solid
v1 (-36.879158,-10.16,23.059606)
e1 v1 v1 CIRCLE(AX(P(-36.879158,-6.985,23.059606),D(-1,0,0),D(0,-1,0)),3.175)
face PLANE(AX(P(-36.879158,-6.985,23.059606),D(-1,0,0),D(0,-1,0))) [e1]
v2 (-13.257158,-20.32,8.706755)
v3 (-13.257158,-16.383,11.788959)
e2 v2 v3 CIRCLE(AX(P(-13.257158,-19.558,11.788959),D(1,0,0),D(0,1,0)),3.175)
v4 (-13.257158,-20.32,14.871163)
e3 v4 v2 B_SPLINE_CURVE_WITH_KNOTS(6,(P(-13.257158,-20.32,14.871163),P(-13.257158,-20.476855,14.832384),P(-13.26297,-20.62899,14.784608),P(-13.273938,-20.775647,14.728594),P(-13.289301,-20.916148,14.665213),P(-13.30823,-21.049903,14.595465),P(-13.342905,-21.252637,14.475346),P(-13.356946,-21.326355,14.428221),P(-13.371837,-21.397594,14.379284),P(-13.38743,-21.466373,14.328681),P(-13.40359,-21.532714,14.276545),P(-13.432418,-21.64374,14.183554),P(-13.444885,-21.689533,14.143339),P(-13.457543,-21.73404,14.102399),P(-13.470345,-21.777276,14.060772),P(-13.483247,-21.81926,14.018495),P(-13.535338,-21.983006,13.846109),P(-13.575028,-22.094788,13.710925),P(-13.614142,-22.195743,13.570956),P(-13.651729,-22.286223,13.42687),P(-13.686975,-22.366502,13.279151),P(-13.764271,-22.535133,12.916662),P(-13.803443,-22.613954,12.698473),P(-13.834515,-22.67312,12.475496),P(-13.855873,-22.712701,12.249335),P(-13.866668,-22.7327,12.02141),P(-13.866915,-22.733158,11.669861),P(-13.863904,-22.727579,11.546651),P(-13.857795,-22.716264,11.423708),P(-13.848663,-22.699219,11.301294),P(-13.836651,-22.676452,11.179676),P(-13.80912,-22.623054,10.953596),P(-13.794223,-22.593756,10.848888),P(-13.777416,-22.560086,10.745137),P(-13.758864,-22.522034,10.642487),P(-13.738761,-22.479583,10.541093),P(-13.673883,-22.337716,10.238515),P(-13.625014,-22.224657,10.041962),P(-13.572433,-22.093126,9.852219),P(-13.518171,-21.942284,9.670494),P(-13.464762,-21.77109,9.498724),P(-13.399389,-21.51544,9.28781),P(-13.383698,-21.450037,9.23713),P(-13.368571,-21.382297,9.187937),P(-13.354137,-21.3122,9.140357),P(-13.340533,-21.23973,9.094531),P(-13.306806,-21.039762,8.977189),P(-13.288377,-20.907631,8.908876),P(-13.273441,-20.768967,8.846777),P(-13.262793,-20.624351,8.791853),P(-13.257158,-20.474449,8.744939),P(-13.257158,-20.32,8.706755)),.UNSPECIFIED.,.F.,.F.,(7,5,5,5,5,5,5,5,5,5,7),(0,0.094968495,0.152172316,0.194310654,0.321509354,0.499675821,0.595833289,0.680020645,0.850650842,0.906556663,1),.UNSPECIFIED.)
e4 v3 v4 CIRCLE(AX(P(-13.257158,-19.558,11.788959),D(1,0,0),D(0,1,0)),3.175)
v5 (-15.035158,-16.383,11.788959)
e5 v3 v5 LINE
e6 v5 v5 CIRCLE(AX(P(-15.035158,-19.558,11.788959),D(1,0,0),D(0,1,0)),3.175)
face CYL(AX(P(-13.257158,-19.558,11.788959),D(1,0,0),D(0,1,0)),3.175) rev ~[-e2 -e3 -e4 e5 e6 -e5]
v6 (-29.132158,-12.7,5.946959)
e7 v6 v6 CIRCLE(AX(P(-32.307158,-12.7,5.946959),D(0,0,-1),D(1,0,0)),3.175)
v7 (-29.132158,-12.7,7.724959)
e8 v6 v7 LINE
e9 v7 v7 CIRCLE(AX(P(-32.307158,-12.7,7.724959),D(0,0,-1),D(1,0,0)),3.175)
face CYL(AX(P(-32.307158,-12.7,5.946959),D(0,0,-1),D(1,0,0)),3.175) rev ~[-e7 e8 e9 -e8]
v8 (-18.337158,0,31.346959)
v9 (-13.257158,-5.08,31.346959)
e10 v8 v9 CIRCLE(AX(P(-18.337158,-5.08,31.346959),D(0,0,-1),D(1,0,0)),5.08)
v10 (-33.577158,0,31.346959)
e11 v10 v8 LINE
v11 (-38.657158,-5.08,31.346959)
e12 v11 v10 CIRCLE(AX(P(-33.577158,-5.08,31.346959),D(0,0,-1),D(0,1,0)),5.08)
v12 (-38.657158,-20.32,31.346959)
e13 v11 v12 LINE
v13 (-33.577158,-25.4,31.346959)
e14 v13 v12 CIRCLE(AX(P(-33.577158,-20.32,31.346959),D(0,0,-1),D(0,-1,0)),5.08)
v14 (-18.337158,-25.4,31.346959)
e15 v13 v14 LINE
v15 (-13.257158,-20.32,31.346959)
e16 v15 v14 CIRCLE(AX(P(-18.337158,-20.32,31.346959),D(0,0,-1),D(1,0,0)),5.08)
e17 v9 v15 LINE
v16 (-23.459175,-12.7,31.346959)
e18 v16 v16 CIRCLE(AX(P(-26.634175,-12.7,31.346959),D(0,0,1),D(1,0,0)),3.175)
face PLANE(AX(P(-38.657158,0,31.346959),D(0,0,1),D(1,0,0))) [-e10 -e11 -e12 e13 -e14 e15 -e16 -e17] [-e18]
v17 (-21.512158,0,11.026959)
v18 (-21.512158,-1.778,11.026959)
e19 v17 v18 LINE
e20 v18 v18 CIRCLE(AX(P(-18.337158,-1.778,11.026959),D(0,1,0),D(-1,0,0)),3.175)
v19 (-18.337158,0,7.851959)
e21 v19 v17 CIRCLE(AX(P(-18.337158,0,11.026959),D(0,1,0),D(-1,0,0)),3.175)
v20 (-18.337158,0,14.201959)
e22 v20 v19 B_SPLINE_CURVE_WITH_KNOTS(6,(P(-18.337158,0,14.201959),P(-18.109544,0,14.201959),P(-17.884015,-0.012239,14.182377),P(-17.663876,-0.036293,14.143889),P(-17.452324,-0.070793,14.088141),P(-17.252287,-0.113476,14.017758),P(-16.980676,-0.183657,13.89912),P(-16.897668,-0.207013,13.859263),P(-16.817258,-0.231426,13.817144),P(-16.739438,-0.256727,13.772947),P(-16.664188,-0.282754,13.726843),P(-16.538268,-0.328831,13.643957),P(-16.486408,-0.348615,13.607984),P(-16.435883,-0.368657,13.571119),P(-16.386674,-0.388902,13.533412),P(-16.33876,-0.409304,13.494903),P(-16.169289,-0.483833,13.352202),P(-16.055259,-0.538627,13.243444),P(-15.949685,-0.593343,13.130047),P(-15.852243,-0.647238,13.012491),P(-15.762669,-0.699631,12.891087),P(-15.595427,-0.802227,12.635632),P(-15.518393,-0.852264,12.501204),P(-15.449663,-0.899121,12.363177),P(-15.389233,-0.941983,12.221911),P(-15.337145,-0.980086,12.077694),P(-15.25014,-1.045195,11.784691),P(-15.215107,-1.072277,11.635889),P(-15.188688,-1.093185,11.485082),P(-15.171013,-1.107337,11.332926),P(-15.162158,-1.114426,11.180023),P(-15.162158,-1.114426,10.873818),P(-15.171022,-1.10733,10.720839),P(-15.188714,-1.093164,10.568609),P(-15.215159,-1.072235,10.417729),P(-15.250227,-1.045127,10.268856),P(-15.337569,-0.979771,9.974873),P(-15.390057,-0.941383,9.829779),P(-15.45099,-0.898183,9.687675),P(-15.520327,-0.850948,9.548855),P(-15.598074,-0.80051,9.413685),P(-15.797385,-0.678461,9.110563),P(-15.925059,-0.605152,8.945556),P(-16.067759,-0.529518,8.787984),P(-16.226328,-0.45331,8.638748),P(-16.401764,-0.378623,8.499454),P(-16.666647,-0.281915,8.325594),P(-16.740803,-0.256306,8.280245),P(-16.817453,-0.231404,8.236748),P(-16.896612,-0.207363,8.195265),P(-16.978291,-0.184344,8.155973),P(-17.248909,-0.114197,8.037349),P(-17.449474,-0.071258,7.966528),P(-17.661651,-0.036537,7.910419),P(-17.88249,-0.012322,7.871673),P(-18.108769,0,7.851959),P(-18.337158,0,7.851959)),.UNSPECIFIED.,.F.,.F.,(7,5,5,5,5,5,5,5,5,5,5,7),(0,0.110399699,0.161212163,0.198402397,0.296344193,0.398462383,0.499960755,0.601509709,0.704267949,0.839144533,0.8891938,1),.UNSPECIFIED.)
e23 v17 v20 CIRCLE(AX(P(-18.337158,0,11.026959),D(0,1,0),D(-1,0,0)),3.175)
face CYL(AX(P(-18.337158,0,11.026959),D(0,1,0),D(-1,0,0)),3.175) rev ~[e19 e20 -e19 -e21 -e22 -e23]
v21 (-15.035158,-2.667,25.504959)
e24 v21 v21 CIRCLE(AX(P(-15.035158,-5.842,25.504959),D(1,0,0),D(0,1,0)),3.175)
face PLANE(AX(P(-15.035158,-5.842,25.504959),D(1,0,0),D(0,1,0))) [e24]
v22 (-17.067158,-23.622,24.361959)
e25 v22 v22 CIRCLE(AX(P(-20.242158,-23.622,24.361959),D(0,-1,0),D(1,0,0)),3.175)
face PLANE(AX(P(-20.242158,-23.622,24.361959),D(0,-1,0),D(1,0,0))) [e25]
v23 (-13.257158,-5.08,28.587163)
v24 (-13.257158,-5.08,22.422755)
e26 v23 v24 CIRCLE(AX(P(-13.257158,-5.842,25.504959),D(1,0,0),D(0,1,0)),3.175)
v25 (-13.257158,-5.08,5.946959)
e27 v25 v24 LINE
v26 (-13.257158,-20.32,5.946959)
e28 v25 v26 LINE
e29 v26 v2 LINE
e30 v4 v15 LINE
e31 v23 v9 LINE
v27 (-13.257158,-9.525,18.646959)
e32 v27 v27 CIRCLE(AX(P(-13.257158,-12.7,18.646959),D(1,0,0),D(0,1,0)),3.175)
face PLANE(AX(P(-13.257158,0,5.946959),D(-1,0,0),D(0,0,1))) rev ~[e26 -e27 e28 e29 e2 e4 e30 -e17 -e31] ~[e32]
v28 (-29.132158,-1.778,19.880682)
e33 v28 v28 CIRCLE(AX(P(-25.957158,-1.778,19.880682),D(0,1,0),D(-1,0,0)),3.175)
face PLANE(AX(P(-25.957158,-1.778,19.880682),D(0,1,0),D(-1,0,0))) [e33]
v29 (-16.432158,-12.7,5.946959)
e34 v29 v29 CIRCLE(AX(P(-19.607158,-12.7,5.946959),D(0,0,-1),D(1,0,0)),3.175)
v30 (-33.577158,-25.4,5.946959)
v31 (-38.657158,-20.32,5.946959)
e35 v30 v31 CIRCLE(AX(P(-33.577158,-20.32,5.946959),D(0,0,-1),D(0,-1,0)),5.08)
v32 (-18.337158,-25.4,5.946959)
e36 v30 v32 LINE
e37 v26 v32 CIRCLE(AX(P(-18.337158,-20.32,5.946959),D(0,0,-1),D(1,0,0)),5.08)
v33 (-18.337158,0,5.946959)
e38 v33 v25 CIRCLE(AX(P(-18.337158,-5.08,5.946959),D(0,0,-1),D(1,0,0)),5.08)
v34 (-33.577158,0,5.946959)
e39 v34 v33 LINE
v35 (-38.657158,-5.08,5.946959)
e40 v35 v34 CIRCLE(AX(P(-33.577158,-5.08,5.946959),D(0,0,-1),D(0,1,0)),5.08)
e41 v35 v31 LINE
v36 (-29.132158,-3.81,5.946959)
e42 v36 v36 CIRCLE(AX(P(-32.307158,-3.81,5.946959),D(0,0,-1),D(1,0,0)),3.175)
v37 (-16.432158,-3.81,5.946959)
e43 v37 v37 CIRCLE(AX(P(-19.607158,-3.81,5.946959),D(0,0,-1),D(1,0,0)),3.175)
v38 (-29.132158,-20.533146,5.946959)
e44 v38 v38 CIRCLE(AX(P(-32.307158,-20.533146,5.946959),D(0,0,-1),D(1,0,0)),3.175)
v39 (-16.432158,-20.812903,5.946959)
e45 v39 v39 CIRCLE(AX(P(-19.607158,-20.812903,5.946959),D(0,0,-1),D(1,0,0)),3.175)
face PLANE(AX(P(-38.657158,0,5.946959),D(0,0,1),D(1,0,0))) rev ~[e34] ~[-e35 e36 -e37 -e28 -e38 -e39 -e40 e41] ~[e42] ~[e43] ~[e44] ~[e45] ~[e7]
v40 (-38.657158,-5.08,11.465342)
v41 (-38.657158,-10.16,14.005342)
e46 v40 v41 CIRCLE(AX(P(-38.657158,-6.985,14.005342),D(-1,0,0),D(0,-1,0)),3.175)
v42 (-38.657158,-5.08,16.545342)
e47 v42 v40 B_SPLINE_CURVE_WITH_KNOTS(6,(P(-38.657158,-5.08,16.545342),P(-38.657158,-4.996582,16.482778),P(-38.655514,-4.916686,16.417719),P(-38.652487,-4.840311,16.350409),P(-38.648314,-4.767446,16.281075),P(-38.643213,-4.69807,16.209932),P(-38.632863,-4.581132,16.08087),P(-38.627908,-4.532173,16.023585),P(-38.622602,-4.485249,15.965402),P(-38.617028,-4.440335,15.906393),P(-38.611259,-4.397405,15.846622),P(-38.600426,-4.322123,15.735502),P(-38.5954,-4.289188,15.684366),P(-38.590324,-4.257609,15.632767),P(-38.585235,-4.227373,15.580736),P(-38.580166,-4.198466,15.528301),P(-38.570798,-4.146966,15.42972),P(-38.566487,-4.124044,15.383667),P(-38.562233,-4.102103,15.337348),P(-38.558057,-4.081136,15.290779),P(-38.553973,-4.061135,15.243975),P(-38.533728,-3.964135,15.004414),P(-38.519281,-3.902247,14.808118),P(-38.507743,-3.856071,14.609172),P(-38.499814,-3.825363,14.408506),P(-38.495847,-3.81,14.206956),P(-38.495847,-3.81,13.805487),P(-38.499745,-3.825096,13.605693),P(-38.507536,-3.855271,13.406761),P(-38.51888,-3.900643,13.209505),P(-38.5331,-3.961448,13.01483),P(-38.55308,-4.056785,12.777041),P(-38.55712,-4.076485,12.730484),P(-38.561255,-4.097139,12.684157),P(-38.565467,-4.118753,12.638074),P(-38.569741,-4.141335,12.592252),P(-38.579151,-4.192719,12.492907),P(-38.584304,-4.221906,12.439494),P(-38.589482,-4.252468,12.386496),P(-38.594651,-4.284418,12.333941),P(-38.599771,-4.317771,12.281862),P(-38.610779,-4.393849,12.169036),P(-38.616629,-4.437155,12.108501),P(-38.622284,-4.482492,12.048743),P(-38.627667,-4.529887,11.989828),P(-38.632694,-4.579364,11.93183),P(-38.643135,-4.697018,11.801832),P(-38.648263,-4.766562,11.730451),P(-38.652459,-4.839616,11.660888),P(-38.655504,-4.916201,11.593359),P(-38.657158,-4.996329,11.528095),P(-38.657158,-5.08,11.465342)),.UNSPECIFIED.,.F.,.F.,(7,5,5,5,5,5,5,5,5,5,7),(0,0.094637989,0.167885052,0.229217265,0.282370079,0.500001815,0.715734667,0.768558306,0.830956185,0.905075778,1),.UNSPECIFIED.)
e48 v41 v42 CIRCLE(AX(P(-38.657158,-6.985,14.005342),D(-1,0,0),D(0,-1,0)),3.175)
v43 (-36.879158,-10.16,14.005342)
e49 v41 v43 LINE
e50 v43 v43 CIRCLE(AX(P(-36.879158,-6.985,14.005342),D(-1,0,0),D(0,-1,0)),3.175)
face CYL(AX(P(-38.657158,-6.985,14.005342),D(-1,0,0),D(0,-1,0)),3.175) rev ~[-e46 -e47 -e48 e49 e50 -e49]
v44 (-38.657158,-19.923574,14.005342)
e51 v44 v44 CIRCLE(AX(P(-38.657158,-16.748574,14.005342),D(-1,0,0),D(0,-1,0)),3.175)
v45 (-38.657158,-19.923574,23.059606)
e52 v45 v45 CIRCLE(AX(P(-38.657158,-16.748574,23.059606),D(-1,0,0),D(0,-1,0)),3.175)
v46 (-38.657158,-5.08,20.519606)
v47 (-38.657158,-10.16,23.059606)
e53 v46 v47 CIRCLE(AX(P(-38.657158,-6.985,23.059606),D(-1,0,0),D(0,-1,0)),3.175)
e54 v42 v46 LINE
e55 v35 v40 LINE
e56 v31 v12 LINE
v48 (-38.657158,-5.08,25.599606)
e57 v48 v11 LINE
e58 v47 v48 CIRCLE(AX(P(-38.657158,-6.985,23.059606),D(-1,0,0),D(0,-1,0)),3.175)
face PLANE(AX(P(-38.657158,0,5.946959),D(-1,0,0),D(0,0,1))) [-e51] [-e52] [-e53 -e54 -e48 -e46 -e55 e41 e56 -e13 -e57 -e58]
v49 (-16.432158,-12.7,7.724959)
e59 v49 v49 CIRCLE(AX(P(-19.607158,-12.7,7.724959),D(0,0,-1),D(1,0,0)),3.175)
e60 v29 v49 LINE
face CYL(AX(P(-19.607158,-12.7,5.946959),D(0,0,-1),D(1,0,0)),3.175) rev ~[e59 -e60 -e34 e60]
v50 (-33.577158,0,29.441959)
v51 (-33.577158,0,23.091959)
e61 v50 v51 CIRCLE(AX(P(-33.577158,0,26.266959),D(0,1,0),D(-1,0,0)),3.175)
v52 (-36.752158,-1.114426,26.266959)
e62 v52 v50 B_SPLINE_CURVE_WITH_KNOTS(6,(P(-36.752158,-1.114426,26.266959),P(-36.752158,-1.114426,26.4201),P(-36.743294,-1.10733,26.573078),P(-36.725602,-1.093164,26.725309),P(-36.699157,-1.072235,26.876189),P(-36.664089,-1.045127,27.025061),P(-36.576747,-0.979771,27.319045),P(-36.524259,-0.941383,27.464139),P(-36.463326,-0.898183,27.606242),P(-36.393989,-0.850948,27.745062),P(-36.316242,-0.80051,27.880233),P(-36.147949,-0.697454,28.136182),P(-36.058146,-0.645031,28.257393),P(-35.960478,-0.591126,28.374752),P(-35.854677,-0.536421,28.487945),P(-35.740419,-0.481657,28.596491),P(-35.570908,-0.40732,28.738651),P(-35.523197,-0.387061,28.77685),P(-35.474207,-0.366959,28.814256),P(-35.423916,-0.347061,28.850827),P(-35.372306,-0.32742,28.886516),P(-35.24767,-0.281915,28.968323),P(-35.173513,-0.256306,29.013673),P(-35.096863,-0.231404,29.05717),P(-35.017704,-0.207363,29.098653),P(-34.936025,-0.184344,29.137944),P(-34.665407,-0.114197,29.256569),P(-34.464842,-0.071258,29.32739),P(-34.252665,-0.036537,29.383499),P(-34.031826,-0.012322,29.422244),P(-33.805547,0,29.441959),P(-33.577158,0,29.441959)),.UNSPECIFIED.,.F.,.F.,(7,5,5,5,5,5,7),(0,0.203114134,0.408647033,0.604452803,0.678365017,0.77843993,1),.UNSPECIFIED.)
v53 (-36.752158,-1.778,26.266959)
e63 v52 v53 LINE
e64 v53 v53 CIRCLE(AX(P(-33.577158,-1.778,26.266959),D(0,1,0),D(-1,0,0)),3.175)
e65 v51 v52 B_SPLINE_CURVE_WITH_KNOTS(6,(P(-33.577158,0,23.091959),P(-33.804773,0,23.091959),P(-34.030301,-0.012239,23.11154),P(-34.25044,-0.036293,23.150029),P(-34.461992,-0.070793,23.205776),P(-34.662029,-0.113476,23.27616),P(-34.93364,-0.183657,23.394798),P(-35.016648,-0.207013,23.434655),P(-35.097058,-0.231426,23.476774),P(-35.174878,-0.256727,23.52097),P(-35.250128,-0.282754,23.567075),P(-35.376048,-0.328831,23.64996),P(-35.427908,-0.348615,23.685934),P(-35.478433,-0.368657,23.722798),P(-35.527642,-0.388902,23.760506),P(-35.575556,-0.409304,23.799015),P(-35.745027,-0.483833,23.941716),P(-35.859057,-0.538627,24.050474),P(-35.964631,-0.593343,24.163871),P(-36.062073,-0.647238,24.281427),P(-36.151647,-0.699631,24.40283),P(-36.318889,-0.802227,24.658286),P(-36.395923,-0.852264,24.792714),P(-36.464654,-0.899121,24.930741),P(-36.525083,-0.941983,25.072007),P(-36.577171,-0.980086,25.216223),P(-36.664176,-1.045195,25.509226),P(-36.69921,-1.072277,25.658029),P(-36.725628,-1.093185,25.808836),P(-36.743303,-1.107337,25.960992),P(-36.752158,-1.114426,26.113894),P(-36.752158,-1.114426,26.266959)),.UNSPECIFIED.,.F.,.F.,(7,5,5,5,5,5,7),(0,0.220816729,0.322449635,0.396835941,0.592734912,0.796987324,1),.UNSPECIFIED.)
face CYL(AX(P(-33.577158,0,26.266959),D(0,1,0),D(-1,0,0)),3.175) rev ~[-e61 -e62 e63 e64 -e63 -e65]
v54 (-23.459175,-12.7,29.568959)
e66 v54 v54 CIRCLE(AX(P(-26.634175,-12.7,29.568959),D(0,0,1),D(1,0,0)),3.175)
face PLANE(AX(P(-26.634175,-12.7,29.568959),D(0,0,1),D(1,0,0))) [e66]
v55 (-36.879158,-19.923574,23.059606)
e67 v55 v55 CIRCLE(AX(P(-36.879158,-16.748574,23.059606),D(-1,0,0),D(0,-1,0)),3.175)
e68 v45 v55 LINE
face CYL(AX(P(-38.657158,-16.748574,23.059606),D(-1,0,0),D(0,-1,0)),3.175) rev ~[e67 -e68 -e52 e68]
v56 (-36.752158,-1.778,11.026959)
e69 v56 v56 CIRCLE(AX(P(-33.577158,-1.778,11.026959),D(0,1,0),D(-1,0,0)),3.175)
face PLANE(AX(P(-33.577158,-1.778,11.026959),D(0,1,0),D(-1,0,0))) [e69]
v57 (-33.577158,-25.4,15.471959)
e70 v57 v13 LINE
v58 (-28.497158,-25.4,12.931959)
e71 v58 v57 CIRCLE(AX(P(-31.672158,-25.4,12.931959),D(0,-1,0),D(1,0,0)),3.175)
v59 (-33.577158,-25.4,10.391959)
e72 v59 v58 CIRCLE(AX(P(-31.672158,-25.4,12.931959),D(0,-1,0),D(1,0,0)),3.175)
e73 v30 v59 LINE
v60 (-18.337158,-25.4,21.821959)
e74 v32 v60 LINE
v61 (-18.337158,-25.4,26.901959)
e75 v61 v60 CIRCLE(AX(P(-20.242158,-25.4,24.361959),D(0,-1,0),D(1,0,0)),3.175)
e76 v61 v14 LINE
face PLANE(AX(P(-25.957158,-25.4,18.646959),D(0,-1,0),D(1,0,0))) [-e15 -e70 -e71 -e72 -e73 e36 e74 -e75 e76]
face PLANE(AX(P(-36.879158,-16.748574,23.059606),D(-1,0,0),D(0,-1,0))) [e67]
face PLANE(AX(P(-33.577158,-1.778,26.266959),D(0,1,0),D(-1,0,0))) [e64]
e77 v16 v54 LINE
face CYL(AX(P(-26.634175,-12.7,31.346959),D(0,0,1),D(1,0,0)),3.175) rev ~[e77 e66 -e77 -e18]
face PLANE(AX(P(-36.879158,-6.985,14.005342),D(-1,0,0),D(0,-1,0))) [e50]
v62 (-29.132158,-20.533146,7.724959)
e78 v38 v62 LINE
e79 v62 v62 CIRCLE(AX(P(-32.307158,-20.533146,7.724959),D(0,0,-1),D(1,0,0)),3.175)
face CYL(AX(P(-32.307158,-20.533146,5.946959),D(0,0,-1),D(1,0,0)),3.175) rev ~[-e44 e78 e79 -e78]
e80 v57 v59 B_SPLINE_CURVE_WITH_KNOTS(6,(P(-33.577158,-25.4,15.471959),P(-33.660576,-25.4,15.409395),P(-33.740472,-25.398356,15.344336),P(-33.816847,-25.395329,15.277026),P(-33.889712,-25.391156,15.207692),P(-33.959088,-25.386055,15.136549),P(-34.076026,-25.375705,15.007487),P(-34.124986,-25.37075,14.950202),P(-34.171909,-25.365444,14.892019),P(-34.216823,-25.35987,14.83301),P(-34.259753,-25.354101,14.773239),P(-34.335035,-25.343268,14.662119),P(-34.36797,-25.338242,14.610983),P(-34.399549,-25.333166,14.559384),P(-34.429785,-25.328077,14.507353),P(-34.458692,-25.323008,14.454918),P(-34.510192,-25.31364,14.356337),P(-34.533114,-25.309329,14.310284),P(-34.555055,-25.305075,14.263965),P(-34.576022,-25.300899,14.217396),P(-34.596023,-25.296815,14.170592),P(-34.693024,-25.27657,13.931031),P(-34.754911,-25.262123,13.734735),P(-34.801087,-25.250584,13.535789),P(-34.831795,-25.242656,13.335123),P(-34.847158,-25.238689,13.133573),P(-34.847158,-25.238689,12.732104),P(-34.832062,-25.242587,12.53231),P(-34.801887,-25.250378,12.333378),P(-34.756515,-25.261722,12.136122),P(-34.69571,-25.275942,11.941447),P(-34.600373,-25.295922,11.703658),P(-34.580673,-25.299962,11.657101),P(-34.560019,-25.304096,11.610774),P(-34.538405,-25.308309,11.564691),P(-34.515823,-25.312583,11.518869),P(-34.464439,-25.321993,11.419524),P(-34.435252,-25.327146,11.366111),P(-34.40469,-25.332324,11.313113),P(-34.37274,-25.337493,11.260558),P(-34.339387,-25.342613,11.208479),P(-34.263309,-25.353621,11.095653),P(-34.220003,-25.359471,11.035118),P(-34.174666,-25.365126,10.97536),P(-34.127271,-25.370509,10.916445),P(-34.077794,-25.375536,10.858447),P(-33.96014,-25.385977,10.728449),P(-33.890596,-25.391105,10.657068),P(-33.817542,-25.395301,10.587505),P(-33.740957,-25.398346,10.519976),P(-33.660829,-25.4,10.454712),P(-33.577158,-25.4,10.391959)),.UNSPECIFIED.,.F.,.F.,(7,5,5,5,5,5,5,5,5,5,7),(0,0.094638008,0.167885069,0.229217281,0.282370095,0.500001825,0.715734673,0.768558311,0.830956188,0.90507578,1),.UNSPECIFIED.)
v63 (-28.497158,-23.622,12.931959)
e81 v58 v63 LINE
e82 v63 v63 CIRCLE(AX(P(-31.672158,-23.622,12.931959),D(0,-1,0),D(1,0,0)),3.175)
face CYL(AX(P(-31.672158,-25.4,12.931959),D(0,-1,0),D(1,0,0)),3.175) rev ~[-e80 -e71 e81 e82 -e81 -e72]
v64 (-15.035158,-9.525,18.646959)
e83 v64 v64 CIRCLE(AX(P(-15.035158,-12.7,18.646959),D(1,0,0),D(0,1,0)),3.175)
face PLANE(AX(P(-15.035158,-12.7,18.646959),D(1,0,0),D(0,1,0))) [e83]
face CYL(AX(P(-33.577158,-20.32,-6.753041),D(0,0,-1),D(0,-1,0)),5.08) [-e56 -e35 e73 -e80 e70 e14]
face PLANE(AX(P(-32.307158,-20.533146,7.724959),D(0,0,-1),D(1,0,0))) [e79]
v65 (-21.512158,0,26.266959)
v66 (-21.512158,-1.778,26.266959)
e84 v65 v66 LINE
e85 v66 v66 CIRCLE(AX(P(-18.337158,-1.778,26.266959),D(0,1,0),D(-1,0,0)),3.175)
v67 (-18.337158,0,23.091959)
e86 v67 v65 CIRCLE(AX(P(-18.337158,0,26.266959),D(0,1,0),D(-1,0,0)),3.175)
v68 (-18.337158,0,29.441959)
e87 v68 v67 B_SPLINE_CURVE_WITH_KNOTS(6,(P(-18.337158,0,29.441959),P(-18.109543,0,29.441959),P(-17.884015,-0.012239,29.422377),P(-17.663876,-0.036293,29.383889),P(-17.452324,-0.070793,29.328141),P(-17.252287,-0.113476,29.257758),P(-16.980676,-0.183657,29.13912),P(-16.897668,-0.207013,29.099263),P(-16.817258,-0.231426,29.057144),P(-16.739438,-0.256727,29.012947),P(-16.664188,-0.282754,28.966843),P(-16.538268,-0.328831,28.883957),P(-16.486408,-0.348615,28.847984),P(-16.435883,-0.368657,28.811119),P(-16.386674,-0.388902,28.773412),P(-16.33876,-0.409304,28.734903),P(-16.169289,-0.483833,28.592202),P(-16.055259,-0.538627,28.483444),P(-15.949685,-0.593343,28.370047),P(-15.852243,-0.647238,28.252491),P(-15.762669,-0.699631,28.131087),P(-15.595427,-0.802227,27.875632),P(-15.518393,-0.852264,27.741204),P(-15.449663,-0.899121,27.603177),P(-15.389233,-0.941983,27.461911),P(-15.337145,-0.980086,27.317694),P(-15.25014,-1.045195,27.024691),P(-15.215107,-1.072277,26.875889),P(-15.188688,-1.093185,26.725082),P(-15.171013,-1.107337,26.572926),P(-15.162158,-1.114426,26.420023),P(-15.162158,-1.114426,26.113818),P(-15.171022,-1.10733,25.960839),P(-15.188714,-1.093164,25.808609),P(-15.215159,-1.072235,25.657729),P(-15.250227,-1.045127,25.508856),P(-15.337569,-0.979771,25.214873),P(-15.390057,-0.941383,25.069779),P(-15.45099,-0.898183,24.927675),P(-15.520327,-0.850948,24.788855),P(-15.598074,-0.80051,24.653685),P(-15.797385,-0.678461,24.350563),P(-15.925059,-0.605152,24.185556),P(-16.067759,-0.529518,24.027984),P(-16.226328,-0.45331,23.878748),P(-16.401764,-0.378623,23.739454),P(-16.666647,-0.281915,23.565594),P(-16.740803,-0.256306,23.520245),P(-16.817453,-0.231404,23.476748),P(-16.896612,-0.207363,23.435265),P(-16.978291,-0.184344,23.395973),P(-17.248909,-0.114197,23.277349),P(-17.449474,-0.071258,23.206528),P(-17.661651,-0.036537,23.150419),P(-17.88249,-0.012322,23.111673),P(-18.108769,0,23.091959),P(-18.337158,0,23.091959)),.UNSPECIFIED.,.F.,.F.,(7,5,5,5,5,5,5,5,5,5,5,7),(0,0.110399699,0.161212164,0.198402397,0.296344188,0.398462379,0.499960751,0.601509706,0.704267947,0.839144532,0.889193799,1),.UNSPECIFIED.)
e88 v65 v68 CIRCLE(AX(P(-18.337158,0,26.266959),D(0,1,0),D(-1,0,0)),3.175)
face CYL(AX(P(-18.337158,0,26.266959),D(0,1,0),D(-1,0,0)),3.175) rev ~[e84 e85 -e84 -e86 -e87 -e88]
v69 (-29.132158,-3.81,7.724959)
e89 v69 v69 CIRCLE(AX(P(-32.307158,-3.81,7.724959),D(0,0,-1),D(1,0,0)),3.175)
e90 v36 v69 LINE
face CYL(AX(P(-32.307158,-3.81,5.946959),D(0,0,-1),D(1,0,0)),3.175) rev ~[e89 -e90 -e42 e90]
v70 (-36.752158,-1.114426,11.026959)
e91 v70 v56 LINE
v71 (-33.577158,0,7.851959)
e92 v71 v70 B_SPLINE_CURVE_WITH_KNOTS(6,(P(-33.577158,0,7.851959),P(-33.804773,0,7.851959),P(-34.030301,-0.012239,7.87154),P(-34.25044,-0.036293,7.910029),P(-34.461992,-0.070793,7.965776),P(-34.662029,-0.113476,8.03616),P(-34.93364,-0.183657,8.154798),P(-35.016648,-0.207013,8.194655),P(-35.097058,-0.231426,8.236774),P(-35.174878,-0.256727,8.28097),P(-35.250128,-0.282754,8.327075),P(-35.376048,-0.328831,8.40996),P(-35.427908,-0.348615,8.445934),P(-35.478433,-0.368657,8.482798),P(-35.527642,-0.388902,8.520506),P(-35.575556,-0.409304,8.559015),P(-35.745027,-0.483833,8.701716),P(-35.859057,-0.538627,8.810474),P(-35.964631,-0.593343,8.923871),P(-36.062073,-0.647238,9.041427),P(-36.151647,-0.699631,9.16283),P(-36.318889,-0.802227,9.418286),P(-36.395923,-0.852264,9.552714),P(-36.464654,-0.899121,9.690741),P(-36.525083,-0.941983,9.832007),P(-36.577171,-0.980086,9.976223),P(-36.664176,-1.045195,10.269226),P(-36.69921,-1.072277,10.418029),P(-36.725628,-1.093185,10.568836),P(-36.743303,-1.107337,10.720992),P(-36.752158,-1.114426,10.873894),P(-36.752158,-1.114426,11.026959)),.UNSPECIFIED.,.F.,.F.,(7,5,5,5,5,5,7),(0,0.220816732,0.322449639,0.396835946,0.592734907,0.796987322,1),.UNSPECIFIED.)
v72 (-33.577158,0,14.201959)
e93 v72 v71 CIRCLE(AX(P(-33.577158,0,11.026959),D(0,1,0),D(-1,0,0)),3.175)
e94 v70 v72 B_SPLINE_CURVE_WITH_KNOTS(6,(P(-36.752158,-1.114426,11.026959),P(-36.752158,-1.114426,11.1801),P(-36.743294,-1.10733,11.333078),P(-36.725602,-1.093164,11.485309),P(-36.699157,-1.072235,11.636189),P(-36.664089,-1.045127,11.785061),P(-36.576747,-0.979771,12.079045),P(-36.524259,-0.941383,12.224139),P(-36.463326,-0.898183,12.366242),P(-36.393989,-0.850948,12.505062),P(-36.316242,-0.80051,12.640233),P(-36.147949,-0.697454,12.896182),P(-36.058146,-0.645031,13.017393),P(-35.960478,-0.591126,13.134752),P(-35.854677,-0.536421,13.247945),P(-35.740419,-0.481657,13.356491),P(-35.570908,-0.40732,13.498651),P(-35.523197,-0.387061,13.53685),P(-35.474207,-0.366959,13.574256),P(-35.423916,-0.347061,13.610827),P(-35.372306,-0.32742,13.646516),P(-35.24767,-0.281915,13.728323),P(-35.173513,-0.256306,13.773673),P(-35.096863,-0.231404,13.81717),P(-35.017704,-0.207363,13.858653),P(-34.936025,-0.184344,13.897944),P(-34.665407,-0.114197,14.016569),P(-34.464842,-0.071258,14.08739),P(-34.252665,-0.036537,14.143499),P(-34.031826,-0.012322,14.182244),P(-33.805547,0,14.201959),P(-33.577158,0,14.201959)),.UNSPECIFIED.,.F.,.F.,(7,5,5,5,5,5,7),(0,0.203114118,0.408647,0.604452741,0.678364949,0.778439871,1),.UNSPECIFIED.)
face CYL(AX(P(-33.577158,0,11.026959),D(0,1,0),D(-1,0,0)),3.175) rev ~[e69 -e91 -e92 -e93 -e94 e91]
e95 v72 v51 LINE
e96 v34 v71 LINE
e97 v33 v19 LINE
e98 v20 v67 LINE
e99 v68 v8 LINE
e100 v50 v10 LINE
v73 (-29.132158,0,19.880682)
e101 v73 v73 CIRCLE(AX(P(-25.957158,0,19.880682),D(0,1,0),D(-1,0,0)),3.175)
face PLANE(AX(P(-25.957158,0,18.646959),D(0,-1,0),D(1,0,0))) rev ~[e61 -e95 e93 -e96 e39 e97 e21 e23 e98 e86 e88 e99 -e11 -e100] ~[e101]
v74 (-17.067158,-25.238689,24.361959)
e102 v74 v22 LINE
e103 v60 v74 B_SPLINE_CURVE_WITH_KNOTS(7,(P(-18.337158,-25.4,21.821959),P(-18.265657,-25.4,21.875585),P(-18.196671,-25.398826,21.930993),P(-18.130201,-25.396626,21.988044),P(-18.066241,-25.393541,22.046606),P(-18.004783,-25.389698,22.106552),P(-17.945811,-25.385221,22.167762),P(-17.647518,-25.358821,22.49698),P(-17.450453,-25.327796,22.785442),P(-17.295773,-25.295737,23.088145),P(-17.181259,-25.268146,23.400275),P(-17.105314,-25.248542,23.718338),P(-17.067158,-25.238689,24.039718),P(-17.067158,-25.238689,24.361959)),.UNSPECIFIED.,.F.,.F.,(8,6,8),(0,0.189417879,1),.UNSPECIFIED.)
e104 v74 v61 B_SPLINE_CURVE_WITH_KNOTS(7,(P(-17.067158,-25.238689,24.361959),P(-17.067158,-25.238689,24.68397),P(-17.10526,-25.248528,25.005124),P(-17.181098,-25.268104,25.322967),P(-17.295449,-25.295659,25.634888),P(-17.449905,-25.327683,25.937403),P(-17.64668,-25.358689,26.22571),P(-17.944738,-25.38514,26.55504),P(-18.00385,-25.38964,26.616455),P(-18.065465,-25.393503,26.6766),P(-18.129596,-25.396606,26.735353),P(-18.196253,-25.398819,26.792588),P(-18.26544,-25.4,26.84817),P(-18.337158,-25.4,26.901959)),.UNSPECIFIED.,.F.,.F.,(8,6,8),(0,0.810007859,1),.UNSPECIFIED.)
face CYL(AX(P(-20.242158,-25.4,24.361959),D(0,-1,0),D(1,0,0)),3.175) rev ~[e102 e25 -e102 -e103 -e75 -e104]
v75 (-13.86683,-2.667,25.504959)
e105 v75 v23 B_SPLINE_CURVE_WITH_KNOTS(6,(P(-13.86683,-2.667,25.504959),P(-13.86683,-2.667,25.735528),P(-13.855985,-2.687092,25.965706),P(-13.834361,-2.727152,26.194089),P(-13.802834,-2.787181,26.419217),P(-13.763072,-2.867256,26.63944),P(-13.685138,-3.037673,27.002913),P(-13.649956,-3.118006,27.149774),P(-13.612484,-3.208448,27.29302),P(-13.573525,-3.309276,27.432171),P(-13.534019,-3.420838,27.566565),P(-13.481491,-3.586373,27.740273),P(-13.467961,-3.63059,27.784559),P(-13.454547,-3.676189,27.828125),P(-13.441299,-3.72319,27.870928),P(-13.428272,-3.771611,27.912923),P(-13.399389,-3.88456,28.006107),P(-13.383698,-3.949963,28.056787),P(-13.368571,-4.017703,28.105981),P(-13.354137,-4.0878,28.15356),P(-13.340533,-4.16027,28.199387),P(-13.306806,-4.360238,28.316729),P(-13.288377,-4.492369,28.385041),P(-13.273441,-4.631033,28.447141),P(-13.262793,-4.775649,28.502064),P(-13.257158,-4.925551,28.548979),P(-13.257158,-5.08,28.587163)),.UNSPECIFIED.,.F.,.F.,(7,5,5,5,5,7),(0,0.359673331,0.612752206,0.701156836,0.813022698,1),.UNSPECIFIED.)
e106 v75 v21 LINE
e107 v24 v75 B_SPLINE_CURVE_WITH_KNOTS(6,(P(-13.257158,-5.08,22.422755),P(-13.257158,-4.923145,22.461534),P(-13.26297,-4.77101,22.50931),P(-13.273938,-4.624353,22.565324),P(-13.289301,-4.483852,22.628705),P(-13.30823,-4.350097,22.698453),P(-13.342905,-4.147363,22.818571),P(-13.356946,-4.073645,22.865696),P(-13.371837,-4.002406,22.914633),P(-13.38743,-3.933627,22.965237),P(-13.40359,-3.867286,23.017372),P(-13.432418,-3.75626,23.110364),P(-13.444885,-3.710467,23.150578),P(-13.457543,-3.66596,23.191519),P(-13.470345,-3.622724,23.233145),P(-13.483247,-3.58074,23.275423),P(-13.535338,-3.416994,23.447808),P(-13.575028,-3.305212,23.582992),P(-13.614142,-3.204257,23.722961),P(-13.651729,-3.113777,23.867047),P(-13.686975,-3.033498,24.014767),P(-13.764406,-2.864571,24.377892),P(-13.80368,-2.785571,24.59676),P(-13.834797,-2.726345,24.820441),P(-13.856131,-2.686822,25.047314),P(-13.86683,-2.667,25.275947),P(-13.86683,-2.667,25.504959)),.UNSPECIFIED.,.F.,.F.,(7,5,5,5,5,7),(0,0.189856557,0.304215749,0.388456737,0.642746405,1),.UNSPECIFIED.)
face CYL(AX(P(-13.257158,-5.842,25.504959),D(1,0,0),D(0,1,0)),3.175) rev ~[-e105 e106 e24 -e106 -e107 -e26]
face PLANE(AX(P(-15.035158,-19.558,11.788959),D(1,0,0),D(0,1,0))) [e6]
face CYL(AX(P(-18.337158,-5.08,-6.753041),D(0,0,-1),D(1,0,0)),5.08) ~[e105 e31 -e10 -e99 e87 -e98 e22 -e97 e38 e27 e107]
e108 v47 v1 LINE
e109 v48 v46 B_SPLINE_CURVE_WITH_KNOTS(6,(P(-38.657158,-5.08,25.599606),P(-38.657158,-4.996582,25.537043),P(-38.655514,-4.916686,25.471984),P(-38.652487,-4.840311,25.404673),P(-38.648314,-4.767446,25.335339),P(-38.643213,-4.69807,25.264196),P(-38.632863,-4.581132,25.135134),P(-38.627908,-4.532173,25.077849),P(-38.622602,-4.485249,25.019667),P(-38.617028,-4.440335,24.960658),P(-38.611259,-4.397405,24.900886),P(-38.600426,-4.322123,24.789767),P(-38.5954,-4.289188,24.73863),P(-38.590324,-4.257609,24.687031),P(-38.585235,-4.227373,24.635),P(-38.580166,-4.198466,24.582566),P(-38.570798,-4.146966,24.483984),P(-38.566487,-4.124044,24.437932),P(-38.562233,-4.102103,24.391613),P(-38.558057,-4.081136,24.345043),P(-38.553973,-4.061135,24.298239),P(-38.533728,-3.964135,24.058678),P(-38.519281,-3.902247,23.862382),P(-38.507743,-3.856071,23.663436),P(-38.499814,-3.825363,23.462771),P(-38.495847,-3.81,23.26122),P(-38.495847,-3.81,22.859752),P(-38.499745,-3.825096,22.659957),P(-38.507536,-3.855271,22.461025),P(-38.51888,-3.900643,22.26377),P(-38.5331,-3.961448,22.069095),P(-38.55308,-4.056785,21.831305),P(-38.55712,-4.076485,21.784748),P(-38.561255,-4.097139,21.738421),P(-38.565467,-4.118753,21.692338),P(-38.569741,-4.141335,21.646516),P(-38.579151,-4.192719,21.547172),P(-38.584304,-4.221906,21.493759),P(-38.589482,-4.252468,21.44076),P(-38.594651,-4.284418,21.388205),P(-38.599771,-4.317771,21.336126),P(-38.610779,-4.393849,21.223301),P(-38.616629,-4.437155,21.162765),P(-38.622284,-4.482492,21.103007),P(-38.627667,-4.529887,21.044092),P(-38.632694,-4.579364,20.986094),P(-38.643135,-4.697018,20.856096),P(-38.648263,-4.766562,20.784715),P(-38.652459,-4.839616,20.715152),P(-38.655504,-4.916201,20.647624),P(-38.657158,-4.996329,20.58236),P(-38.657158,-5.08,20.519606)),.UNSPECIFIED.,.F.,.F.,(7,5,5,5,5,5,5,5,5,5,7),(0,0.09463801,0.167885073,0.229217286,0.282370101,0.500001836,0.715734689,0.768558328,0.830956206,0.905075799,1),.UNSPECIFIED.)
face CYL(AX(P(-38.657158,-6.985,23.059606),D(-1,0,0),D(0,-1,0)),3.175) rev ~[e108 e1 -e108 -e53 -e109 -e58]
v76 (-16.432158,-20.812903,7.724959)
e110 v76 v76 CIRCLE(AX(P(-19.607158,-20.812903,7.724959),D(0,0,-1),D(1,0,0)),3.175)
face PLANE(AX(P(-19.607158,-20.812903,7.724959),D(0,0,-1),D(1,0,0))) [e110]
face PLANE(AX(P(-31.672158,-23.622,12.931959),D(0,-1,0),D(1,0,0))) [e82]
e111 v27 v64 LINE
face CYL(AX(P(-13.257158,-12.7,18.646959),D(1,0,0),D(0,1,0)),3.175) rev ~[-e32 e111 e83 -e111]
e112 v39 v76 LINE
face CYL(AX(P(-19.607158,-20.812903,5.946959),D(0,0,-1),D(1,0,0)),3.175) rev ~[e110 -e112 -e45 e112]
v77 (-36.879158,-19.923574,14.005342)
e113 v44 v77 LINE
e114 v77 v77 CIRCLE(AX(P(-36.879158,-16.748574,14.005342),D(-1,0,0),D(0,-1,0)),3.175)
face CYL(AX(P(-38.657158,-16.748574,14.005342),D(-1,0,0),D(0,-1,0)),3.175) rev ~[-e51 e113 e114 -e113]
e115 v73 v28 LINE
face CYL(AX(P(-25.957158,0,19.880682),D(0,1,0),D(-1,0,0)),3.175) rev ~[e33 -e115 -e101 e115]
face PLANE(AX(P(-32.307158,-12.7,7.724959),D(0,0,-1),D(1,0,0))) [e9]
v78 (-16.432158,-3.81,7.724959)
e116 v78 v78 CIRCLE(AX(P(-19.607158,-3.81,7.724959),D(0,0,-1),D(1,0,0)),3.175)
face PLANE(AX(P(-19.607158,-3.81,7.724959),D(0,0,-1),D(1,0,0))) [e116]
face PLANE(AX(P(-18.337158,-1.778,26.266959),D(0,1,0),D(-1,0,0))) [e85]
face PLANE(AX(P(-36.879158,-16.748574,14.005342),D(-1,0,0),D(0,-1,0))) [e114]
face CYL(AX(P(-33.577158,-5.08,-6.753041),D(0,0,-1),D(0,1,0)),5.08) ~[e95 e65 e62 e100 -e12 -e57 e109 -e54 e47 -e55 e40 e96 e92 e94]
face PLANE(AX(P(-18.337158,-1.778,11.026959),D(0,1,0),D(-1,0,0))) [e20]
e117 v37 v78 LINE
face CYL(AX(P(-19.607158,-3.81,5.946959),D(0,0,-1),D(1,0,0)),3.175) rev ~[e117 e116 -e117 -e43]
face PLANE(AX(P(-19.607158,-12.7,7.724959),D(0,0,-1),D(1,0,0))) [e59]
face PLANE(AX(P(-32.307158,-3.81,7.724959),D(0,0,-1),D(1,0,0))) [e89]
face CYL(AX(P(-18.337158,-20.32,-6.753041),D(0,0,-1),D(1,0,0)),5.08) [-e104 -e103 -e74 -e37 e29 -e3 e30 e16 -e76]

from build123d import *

# Parameters (mm, degrees)
F0_W         = 25.4
F0_H         = 25.4
F1_DEPTH     = 25.4
F2_R         = 3.175
F9_DEPTH     = 1.778
F3_R         = 3.175
F10_DEPTH    = 1.778
F4_R         = 3.175
F11_DEPTH    = 1.778
F5_R         = 3.175
F12_DEPTH    = 1.778
F6_R         = 3.175
F13_DEPTH    = 1.778
F7_R         = 3.175
F14_DEPTH    = 1.778
F8_R         = 3.175
F15_DEPTH    = 1.778
F16_T1_DEPTH = 50.8


# Not quite as in the source:
# - a fillet or chamfer that OpenCascade refuses, or shapes differently, is made with other operations: its cross-section is extruded or revolved along the edge and cut away or added


with BuildPart() as f1:
    # F0 (on Front) → F1 (new body)
    with BuildSketch(Plane.XZ):
        with Locations((-25.9571580286, 18.6469587497)):
            Rectangle(F0_W, F0_H)
    extrude(amount=F1_DEPTH)

    # F2 (on face) → F9 (cut)
    with BuildSketch(Plane.XZ.offset(25.4)):
        with Locations((-31.6721580286, 12.9319587497)):
            Circle(F2_R)
    extrude(amount=-F9_DEPTH, mode=Mode.SUBTRACT)

    # F3 (on face) → F10 (cut)
    with BuildSketch(Plane.XZ.offset(25.4)):
        with Locations((-20.2421580286, 24.3619587497)):
            Circle(F3_R)
    extrude(amount=-F10_DEPTH, mode=Mode.SUBTRACT)

    # F4 (on face) → F11 (cut)
    with BuildSketch(Plane.XY.offset(31.3469587497)):
        with Locations((-26.6341753304, -12.7)):
            Circle(F4_R)
    extrude(amount=-F11_DEPTH, mode=Mode.SUBTRACT)

    # F5 (on face) → F12 (cut)
    with BuildSketch(Plane(origin=(-38.6571580286, 0, 0), x_dir=(0, -1, 0), z_dir=(-1, 0, 0))):
        with Locations((16.7485739568, 23.0596062836)):
            Circle(F5_R)
        with Locations((16.7485739568, 14.0053418102)):
            Circle(F5_R)
        with Locations((6.985, 23.0596062836)):
            Circle(F5_R)
        with Locations((6.985, 14.0053418102)):
            Circle(F5_R)
    extrude(amount=-F12_DEPTH, mode=Mode.SUBTRACT)

    # F6 (on face) → F13 (cut)
    with BuildSketch(Plane.YZ.offset(-13.2571580286)):
        with Locations((-12.7, 18.6469587497)):
            Circle(F6_R)
        with Locations((-19.558, 11.7889587497)):
            Circle(F6_R)
        with Locations((-5.842, 25.5049587497)):
            Circle(F6_R)
    extrude(amount=-F13_DEPTH, mode=Mode.SUBTRACT)

    # F7 (on face) → F14 (cut)
    with BuildSketch(Plane(origin=(0, 0, 5.9469587497), x_dir=(1, 0, 0), z_dir=(0, 0, -1))):
        with Locations((-32.3071580286, 12.7)):
            Circle(F7_R)
        with Locations((-19.6071580286, 12.7)):
            Circle(F7_R)
        with Locations((-32.3071580286, 20.5331463367)):
            Circle(F7_R)
        with Locations((-32.3071580286, 3.81)):
            Circle(F7_R)
        with Locations((-19.6071580286, 3.81)):
            Circle(F7_R)
        with Locations((-19.6071580286, 20.8129025996)):
            Circle(F7_R)
    extrude(amount=-F14_DEPTH, mode=Mode.SUBTRACT)

    # F8 (on face) → F15 (cut)
    with BuildSketch(Plane(origin=(0, 0, 0), x_dir=(-1, 0, 0), z_dir=(0, 1, 0))):
        with Locations((25.9571580286, 19.88068223)):
            Circle(F8_R)
        with Locations((18.3371580286, 26.2669587497)):
            Circle(F8_R)
        with Locations((18.3371580286, 11.0269587497)):
            Circle(F8_R)
        with Locations((33.5771580286, 11.0269587497)):
            Circle(F8_R)
        with Locations((33.5771580286, 26.2669587497)):
            Circle(F8_R)
    extrude(amount=-F15_DEPTH, mode=Mode.SUBTRACT)

    # F16: fillet of radius 5.08 on 4 edges, made by hand

    # F16_s2 → F16_t1 (cut)
    with BuildSketch(Plane.XY.offset(-6.7530412503)):
        with BuildLine():
            ThreePointArc((-33.5771580286, -25.4), (-37.1692604771, -23.9121024484), (-38.6571580286, -20.32))
            Line((-38.6571580286, -20.32), (-38.6571580286, -25.4))
            Line((-38.6571580286, -25.4), (-33.5771580286, -25.4))
        make_face()
        with BuildLine():
            ThreePointArc((-13.2571580286, -20.32), (-14.7450555802, -23.9121024484), (-18.3371580286, -25.4))
            Line((-18.3371580286, -25.4), (-13.2571580286, -25.4))
            Line((-13.2571580286, -25.4), (-13.2571580286, -20.32))
        make_face()
        with BuildLine():
            ThreePointArc((-13.2571580286, -5.08), (-14.7450555802, -1.4878975516), (-18.3371580286, 0))
            Line((-18.3371580286, 0), (-13.2571580286, 0))
            Line((-13.2571580286, 0), (-13.2571580286, -5.08))
        make_face()
        with BuildLine():
            ThreePointArc((-33.5771580286, 0), (-37.1692604771, -1.4878975516), (-38.6571580286, -5.08))
            Line((-38.6571580286, -5.08), (-38.6571580286, 0))
            Line((-38.6571580286, 0), (-33.5771580286, 0))
        make_face()
    extrude(amount=F16_T1_DEPTH, mode=Mode.SUBTRACT)


solid = f1.part
